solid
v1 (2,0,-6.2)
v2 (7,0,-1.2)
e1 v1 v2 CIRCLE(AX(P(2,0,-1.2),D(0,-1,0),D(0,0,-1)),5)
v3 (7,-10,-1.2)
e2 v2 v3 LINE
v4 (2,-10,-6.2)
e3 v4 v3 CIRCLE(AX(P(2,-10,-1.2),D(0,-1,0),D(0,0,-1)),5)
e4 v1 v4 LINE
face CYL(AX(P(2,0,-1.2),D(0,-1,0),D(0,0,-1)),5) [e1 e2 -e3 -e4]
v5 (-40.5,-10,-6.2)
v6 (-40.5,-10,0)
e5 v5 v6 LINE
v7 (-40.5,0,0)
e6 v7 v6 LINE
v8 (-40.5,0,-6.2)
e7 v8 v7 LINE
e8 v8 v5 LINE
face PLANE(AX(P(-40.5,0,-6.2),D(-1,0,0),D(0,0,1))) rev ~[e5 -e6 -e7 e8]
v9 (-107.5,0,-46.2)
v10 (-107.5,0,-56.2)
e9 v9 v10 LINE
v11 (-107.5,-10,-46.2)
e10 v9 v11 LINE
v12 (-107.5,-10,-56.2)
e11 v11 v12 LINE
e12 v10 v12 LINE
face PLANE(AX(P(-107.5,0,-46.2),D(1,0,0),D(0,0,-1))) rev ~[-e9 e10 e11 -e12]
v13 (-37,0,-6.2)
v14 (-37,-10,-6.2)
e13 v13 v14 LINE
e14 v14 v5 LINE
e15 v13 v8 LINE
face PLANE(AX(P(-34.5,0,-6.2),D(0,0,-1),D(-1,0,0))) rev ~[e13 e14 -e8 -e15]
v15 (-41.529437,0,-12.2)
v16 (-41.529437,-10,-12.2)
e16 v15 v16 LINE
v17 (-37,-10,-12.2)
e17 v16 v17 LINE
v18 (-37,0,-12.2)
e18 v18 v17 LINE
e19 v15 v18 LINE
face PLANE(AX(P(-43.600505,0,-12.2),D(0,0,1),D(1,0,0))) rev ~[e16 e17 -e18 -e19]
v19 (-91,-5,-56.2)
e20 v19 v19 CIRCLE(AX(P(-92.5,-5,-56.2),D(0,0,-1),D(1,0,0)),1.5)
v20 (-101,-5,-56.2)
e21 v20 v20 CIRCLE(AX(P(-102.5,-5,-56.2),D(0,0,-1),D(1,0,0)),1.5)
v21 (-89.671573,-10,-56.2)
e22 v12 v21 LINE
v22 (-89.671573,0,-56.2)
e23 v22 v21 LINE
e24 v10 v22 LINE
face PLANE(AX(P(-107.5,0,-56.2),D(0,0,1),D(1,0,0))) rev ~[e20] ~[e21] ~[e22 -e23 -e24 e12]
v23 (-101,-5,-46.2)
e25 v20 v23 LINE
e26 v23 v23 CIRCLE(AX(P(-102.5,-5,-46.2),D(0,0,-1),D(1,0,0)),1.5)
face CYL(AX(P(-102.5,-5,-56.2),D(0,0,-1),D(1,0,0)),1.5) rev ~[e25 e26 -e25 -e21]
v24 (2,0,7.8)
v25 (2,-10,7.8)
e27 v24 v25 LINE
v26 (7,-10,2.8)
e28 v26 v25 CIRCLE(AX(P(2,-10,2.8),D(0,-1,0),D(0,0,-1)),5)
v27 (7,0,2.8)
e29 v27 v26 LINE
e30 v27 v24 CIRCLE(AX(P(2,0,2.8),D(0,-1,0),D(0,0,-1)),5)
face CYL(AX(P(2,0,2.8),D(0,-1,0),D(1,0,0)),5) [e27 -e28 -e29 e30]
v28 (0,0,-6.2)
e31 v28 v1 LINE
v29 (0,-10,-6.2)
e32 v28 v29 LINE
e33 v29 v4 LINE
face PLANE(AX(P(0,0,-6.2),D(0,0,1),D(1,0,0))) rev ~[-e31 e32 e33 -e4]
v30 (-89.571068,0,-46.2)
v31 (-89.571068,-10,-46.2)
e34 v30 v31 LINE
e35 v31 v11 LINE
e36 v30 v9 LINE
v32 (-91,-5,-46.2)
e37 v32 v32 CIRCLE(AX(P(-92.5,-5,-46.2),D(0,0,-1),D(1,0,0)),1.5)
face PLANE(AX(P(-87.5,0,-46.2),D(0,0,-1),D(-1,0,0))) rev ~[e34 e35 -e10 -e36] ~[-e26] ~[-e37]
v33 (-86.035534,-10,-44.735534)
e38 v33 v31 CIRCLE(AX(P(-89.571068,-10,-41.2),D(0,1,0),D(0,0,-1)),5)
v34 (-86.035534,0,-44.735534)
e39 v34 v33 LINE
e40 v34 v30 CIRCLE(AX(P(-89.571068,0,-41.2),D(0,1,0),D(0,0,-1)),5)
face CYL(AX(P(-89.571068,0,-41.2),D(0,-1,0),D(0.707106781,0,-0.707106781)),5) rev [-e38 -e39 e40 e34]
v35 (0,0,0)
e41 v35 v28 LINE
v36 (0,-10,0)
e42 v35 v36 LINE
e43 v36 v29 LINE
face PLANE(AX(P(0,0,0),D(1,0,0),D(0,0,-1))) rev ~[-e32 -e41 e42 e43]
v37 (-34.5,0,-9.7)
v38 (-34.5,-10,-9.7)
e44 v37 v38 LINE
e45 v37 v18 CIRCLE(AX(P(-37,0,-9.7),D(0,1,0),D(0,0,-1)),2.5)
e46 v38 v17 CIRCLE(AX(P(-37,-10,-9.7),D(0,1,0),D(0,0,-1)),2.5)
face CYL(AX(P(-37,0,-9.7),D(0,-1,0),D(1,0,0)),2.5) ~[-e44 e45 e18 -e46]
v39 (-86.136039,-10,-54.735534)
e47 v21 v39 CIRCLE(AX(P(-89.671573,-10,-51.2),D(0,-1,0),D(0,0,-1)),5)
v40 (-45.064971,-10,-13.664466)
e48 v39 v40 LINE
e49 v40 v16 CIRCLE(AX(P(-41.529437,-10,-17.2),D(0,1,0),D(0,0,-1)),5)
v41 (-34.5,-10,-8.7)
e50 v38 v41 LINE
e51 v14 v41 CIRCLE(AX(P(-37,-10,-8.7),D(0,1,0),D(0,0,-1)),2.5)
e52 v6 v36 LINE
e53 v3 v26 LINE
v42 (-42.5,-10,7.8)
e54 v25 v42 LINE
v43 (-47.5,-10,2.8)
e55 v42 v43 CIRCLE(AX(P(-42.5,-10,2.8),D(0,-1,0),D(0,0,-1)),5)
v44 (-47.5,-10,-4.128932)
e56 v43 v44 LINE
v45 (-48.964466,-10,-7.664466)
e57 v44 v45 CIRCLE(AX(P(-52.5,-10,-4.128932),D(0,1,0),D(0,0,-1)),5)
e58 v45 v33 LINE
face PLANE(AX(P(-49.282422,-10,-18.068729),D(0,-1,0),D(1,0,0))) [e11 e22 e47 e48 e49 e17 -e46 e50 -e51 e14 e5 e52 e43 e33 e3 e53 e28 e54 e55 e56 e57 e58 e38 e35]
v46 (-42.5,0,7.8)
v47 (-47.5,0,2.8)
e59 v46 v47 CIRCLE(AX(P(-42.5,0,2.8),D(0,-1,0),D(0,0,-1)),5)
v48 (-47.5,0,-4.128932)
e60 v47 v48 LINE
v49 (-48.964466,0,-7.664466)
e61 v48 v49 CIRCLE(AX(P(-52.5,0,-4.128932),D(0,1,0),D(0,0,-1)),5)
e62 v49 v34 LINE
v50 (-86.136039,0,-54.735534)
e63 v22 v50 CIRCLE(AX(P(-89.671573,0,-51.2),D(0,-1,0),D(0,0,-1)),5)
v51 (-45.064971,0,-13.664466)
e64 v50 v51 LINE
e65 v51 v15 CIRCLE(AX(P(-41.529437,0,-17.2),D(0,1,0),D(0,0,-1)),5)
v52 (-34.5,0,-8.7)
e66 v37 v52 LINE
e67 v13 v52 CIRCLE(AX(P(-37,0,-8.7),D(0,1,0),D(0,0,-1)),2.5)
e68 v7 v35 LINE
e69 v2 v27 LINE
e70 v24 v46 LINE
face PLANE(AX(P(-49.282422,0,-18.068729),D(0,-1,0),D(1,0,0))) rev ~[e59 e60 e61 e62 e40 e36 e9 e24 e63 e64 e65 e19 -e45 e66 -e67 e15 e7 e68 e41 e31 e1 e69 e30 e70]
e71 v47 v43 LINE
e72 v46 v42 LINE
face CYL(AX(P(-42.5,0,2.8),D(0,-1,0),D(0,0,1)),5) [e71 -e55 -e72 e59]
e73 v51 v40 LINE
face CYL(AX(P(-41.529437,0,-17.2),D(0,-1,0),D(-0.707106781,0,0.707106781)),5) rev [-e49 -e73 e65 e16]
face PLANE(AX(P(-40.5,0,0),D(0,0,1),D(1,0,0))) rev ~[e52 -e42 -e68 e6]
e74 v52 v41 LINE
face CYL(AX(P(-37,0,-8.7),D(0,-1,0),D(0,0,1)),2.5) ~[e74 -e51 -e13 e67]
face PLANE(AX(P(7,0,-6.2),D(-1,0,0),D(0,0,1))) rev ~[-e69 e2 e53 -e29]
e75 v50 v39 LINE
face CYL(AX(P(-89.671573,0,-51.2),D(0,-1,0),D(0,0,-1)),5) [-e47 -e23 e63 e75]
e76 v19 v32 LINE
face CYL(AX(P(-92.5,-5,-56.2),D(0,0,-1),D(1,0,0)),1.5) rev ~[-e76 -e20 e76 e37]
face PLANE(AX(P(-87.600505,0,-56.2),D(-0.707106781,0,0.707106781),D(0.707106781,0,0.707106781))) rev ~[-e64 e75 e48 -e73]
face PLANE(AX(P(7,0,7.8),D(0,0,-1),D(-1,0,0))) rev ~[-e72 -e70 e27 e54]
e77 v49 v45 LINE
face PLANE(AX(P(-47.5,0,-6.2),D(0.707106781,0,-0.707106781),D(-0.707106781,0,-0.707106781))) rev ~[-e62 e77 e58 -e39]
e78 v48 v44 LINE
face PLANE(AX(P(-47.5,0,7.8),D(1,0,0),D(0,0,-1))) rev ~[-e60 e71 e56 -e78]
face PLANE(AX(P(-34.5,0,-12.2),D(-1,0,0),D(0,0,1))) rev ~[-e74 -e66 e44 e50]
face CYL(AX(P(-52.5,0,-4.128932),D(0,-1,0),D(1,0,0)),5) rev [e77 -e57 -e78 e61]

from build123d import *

# Parameters (mm, degrees)
F1_DEPTH = 10
F2_R     = 5
F3_R     = 2.5
F5_R     = 1.5
F6_DEPTH = 25


# Not quite as in the source:
# - two fillets or chamfers of one size are made in one step
# - a feature names something its author has since deleted; it is built from what else it names


with BuildPart() as f1:
    # F0 (on Front) → F1 (new body)
    with BuildSketch(Plane.XZ):
        Polygon((-40.5, 0), (0, 0), (0, -6.2), (7, -6.2), (7, 7.8), (-47.5, 7.8), (-47.5, -6.2), (-87.5, -46.2), (-107.5, -46.2), (-107.5, -56.2), (-87.6005050634, -56.2), (-43.6005050634, -12.2), (-34.5, -12.2), (-34.5, -6.2), (-40.5, -6.2), align=None)
    extrude(amount=F1_DEPTH)

    # F2
    f2_edges = [f1.edges().sort_by_distance(p)[0] for p in [
        (7, -5, -6.2),
        (7, -5, 7.8),
        (-47.5, -5, 7.8),
        (-47.5, -5, -6.2),
        (-87.5, -5, -46.2),
        (-87.600505, -5, -56.2),
        (-43.600505, -5, -12.2),
    ]]
    fillet(f2_edges, radius=F2_R)

    # F3
    f3_edges = [f1.edges().sort_by_distance(p)[0] for p in [
        (-34.5, -5, -12.2),
        (-34.5, -5, -6.2),
    ]]
    fillet(f3_edges, radius=F3_R)

    # F5 (on face) → F6 (cut)
    with BuildSketch(Plane(origin=(0, 0, -56.2), x_dir=(1, 0, 0), z_dir=(0, 0, -1))):
        with Locations((-102.5, 5)):
            Circle(F5_R)
        with Locations((-92.5, 5)):
            Circle(F5_R)
    extrude(amount=-F6_DEPTH, mode=Mode.SUBTRACT)


solid = f1.part
